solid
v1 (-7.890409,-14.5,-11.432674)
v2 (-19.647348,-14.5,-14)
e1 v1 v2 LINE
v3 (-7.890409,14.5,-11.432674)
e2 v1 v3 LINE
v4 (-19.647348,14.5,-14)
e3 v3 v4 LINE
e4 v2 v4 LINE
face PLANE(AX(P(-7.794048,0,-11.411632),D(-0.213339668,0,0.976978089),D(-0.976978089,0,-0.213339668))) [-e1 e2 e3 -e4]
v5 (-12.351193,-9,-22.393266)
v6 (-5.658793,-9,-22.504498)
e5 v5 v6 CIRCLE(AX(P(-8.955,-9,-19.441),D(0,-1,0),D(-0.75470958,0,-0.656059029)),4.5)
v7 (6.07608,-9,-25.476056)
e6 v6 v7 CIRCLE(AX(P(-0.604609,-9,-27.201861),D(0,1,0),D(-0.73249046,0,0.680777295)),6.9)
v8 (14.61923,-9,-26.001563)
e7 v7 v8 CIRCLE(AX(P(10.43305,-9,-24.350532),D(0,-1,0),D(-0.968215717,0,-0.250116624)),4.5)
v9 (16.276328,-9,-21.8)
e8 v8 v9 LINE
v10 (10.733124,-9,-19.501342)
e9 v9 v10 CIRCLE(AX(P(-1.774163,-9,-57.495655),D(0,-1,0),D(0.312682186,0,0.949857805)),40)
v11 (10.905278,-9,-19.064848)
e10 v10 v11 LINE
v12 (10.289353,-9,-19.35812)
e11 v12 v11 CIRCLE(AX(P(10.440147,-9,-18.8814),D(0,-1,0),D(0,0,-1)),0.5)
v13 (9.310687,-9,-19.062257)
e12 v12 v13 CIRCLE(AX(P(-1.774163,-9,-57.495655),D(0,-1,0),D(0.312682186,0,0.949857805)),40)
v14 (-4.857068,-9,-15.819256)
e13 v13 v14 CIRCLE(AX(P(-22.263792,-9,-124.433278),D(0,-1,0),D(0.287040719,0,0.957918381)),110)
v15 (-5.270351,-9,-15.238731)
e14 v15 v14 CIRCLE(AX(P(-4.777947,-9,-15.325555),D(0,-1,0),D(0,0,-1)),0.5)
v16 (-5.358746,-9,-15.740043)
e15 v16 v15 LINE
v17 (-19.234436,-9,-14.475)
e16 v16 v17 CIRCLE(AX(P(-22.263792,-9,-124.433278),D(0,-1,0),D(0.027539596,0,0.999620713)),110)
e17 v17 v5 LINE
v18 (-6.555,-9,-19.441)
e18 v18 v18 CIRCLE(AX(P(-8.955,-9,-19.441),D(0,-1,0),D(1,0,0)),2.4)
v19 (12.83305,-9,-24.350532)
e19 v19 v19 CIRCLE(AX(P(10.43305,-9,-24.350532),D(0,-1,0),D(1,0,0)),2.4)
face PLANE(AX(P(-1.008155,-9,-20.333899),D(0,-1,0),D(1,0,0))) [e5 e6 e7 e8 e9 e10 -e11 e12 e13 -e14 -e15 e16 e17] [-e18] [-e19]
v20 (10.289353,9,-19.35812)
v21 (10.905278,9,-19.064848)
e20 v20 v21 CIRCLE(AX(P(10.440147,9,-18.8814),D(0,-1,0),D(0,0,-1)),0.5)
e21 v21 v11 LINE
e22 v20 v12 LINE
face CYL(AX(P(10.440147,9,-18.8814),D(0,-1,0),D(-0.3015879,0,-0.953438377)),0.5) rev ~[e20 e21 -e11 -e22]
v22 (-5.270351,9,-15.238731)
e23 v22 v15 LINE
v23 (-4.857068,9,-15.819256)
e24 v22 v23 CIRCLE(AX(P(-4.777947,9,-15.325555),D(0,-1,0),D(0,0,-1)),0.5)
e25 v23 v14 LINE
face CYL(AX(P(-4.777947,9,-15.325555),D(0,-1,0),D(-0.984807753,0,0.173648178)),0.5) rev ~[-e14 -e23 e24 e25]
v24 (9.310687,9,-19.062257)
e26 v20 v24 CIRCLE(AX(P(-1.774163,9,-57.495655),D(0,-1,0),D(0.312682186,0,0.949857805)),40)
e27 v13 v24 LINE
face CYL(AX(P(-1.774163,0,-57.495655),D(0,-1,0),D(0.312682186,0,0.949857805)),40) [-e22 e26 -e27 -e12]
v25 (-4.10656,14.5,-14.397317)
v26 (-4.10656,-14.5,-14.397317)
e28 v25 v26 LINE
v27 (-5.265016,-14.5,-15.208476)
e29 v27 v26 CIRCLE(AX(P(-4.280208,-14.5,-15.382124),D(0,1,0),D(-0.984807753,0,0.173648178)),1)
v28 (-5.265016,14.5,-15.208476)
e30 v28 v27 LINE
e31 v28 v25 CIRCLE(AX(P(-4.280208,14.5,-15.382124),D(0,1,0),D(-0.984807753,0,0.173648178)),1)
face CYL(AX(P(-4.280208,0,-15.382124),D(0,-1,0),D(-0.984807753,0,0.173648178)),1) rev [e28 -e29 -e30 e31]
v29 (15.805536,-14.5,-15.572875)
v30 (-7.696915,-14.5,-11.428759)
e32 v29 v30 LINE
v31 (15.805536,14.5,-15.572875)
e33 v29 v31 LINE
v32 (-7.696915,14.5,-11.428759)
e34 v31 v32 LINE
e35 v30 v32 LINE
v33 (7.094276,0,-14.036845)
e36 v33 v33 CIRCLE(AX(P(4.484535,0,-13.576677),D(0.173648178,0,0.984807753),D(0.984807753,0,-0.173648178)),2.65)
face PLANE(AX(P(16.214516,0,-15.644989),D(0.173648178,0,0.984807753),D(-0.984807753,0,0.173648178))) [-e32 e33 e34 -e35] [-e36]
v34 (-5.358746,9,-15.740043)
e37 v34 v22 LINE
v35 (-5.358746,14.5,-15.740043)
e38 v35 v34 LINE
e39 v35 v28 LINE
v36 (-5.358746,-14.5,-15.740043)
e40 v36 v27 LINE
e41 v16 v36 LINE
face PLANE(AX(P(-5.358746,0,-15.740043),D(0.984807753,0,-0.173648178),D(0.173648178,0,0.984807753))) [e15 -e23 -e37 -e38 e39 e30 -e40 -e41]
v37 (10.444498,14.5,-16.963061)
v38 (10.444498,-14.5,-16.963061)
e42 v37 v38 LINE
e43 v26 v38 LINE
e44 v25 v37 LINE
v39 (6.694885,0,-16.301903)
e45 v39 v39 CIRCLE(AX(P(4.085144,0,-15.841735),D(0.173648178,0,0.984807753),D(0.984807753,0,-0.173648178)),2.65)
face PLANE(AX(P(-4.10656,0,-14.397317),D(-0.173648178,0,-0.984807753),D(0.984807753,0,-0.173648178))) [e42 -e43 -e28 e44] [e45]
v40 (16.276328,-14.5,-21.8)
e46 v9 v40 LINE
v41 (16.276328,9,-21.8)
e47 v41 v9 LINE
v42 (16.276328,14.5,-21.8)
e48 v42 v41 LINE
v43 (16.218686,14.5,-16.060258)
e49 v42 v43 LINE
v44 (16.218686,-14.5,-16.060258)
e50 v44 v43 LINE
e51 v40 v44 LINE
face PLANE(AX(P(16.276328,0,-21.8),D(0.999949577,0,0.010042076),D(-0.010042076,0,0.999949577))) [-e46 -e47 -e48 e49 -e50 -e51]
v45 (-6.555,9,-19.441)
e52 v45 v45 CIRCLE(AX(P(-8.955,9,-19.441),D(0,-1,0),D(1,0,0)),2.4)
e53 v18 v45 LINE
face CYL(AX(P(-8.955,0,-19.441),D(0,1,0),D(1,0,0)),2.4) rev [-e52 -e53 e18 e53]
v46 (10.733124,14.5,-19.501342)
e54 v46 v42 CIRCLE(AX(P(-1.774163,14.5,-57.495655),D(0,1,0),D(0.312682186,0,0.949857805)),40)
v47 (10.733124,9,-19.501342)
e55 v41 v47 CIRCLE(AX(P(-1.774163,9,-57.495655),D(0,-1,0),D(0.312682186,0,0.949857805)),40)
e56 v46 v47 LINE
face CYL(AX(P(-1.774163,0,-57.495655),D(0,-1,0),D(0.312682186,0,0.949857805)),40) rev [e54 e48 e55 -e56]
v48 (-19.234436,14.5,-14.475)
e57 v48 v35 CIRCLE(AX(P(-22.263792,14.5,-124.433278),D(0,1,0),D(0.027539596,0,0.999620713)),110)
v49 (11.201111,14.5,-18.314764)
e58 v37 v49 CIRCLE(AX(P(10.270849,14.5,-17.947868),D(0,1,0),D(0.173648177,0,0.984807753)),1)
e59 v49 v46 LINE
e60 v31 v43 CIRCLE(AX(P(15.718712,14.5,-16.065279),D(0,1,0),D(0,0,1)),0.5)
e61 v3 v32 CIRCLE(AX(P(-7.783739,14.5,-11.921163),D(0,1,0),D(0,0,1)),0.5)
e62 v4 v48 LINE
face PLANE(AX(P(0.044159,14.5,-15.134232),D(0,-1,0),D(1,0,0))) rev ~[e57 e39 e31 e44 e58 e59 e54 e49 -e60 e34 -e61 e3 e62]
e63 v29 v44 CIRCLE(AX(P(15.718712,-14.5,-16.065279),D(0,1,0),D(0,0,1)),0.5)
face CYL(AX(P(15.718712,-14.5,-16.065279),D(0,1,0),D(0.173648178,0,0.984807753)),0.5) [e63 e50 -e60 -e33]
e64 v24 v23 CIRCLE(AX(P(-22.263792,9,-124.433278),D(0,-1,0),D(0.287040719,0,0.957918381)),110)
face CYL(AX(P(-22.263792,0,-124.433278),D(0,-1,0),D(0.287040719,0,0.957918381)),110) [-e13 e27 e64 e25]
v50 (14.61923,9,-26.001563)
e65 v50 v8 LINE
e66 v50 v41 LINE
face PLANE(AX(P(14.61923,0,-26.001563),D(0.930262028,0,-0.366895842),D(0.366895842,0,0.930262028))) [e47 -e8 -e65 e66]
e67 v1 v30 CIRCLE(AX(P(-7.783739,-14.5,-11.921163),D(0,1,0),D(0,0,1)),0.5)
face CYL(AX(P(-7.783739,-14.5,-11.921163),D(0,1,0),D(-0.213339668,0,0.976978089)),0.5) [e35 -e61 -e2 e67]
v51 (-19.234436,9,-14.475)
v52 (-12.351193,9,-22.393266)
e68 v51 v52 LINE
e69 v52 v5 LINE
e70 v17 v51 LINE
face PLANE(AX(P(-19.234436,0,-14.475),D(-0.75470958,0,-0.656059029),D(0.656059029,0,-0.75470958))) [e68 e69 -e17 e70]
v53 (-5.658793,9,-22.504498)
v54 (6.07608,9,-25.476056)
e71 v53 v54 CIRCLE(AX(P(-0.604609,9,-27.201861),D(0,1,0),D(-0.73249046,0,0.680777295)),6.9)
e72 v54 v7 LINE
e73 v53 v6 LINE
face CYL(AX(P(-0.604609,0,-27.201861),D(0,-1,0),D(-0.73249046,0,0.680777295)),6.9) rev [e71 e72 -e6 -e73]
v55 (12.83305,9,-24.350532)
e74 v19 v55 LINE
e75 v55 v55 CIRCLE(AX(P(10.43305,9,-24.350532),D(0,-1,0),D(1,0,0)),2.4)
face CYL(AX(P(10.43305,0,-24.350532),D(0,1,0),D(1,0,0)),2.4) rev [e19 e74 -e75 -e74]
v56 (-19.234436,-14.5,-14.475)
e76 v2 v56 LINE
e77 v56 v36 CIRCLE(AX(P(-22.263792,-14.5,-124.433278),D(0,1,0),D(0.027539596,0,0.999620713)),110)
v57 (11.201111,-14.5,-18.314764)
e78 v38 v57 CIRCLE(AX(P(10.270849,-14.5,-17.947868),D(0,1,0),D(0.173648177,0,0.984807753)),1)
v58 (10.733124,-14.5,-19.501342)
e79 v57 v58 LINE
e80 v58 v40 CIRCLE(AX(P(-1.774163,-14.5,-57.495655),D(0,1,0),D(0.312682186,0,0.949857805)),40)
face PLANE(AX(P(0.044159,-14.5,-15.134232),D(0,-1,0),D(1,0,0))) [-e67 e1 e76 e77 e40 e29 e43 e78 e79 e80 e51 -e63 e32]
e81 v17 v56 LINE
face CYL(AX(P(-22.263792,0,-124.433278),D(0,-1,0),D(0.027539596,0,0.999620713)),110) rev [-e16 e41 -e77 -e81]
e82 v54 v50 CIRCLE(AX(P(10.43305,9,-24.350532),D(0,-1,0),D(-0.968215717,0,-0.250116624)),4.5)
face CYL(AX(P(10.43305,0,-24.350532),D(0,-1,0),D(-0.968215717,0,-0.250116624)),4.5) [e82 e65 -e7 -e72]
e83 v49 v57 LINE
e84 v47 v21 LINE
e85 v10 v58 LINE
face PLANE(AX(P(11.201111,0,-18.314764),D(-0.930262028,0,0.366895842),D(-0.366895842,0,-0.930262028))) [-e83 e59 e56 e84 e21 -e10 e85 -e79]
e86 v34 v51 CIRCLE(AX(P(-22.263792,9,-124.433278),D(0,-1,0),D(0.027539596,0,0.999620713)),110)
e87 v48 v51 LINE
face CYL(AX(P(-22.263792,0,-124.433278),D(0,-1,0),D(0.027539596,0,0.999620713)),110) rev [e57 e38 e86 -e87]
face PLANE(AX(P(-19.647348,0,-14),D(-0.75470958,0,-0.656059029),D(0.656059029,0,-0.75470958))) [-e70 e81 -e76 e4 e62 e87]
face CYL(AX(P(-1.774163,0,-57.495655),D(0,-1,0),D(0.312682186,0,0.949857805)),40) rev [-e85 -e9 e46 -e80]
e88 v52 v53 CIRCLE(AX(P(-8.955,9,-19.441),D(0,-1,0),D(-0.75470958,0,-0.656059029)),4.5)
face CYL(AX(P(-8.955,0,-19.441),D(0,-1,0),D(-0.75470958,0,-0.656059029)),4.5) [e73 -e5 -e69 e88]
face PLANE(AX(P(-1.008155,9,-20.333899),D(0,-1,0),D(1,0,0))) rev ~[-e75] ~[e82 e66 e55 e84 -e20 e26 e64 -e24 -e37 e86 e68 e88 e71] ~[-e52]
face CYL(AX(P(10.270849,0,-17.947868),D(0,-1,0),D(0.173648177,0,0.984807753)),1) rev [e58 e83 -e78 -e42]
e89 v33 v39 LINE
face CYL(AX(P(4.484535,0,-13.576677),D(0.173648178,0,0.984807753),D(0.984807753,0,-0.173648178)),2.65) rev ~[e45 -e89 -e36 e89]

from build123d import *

# Parameters (mm, degrees)
F0_R     = 2.4
F1_DEPTH = 9
F2_DEPTH = 14.5
F3_R     = 0.5
F4_R     = 2.65
F5_DEPTH = 3


# Not quite as in the source:
# - two fillets or chamfers of one size are made in one step


with BuildPart() as f1:
    # F0 (on Front) → F1 (new body, symmetric)
    with BuildSketch(Plane.XZ):
        with BuildLine():
            Line((-19.2344364101, -14.475), (-12.351193111, -22.3932656305))
            ThreePointArc((-12.351193111, -22.3932656305), (-9.0297827018, -23.9403785735), (-5.6587929287, -22.5044978281))
            ThreePointArc((-5.6587929287, -22.5044978281), (1.0891796651, -20.5129837703), (6.0760796929, -25.4760564557))
            ThreePointArc((6.0760796929, -25.4760564557), (10.1567684842, -28.8420423371), (14.6192295456, -26.0015629336))
            Line((14.6192295456, -26.0015629336), (16.2763282151, -21.8))
            ThreePointArc((16.2763282151, -21.8), (13.5478934476, -20.5465737293), (10.7331243144, -19.5013424519))
            ThreePointArc((10.7331243144, -19.5013424519), (10.0239485931, -19.2751816233), (9.3106871937, -19.0622565188))
            ThreePointArc((9.3106871937, -19.0622565188), (2.0328204041, -17.1501268195), (-5.3587456661, -15.740043125))
            ThreePointArc((-5.3587456661, -15.740043125), (-12.2765411998, -14.887603878), (-19.2344364101, -14.475))
        make_face()
        with Locations((10.4330504183, -24.3505316455)):
            Circle(F0_R, mode=Mode.SUBTRACT)
        with Locations((-8.955, -19.441)):
            Circle(F0_R, mode=Mode.SUBTRACT)
        with BuildLine():
            Line((-19.6473476105, -14), (-19.2344364101, -14.475))
            ThreePointArc((-19.2344364101, -14.475), (-12.2765411998, -14.887603878), (-5.3587456661, -15.740043125))
            Line((-5.3587456661, -15.740043125), (-5.2650160599, -15.2084761138))
            ThreePointArc((-5.2650160599, -15.2084761138), (-4.8537847433, -14.5629722472), (-4.1065601293, -14.3973165385))
            Line((-4.1065601293, -14.3973165385), (10.4444975606, -16.9630606071))
            ThreePointArc((10.4444975606, -16.9630606071), (11.1434489978, -17.4594321695), (11.2011114112, -18.3147642019))
            Line((11.2011114112, -18.3147642019), (10.7331243144, -19.5013424519))
            ThreePointArc((10.7331243144, -19.5013424519), (13.5478934476, -20.5465737293), (16.2763282151, -21.8))
            Line((16.2763282151, -21.8), (16.2145160132, -15.6449893321))
            Line((16.2145160132, -15.6449893321), (-7.7940477934, -11.4116317649))
            Line((-7.7940477934, -11.4116317649), (-19.6473476105, -14))
        make_face()
    extrude(amount=F1_DEPTH, both=True)

    # F0 (on Front) → F2 (join, symmetric)
    with BuildSketch(Plane.XZ):
        with BuildLine():
            Line((-19.6473476105, -14), (-19.2344364101, -14.475))
            ThreePointArc((-19.2344364101, -14.475), (-12.2765411998, -14.887603878), (-5.3587456661, -15.740043125))
            Line((-5.3587456661, -15.740043125), (-5.2650160599, -15.2084761138))
            ThreePointArc((-5.2650160599, -15.2084761138), (-4.8537847433, -14.5629722472), (-4.1065601293, -14.3973165385))
            Line((-4.1065601293, -14.3973165385), (10.4444975606, -16.9630606071))
            ThreePointArc((10.4444975606, -16.9630606071), (11.1434489978, -17.4594321695), (11.2011114112, -18.3147642019))
            Line((11.2011114112, -18.3147642019), (10.7331243144, -19.5013424519))
            ThreePointArc((10.7331243144, -19.5013424519), (13.5478934476, -20.5465737293), (16.2763282151, -21.8))
            Line((16.2763282151, -21.8), (16.2145160132, -15.6449893321))
            Line((16.2145160132, -15.6449893321), (-7.7940477934, -11.4116317649))
            Line((-7.7940477934, -11.4116317649), (-19.6473476105, -14))
        make_face()
    extrude(amount=F2_DEPTH, both=True)

    # F3
    f3_edges = [f1.edges().sort_by_distance(p)[0] for p in [
        (-5.358746, 0, -15.740043),
        (10.733124, 0, -19.501342),
        (16.214516, 0, -15.644989),
        (-7.794048, 0, -11.411632),
    ]]
    fillet(f3_edges, radius=F3_R)

    # F4 (on face) → F5 (cut)
    with BuildSketch(Plane(origin=(-2.1865232639, 0, -12.4003896345), x_dir=(0.984807753, 0, -0.1736481777), z_dir=(0.1736481777, 0, 0.984807753))):
        with Locations((6.7739703659, 0)):
            Circle(F4_R)
    extrude(amount=-F5_DEPTH, mode=Mode.SUBTRACT)


solid = f1.part
